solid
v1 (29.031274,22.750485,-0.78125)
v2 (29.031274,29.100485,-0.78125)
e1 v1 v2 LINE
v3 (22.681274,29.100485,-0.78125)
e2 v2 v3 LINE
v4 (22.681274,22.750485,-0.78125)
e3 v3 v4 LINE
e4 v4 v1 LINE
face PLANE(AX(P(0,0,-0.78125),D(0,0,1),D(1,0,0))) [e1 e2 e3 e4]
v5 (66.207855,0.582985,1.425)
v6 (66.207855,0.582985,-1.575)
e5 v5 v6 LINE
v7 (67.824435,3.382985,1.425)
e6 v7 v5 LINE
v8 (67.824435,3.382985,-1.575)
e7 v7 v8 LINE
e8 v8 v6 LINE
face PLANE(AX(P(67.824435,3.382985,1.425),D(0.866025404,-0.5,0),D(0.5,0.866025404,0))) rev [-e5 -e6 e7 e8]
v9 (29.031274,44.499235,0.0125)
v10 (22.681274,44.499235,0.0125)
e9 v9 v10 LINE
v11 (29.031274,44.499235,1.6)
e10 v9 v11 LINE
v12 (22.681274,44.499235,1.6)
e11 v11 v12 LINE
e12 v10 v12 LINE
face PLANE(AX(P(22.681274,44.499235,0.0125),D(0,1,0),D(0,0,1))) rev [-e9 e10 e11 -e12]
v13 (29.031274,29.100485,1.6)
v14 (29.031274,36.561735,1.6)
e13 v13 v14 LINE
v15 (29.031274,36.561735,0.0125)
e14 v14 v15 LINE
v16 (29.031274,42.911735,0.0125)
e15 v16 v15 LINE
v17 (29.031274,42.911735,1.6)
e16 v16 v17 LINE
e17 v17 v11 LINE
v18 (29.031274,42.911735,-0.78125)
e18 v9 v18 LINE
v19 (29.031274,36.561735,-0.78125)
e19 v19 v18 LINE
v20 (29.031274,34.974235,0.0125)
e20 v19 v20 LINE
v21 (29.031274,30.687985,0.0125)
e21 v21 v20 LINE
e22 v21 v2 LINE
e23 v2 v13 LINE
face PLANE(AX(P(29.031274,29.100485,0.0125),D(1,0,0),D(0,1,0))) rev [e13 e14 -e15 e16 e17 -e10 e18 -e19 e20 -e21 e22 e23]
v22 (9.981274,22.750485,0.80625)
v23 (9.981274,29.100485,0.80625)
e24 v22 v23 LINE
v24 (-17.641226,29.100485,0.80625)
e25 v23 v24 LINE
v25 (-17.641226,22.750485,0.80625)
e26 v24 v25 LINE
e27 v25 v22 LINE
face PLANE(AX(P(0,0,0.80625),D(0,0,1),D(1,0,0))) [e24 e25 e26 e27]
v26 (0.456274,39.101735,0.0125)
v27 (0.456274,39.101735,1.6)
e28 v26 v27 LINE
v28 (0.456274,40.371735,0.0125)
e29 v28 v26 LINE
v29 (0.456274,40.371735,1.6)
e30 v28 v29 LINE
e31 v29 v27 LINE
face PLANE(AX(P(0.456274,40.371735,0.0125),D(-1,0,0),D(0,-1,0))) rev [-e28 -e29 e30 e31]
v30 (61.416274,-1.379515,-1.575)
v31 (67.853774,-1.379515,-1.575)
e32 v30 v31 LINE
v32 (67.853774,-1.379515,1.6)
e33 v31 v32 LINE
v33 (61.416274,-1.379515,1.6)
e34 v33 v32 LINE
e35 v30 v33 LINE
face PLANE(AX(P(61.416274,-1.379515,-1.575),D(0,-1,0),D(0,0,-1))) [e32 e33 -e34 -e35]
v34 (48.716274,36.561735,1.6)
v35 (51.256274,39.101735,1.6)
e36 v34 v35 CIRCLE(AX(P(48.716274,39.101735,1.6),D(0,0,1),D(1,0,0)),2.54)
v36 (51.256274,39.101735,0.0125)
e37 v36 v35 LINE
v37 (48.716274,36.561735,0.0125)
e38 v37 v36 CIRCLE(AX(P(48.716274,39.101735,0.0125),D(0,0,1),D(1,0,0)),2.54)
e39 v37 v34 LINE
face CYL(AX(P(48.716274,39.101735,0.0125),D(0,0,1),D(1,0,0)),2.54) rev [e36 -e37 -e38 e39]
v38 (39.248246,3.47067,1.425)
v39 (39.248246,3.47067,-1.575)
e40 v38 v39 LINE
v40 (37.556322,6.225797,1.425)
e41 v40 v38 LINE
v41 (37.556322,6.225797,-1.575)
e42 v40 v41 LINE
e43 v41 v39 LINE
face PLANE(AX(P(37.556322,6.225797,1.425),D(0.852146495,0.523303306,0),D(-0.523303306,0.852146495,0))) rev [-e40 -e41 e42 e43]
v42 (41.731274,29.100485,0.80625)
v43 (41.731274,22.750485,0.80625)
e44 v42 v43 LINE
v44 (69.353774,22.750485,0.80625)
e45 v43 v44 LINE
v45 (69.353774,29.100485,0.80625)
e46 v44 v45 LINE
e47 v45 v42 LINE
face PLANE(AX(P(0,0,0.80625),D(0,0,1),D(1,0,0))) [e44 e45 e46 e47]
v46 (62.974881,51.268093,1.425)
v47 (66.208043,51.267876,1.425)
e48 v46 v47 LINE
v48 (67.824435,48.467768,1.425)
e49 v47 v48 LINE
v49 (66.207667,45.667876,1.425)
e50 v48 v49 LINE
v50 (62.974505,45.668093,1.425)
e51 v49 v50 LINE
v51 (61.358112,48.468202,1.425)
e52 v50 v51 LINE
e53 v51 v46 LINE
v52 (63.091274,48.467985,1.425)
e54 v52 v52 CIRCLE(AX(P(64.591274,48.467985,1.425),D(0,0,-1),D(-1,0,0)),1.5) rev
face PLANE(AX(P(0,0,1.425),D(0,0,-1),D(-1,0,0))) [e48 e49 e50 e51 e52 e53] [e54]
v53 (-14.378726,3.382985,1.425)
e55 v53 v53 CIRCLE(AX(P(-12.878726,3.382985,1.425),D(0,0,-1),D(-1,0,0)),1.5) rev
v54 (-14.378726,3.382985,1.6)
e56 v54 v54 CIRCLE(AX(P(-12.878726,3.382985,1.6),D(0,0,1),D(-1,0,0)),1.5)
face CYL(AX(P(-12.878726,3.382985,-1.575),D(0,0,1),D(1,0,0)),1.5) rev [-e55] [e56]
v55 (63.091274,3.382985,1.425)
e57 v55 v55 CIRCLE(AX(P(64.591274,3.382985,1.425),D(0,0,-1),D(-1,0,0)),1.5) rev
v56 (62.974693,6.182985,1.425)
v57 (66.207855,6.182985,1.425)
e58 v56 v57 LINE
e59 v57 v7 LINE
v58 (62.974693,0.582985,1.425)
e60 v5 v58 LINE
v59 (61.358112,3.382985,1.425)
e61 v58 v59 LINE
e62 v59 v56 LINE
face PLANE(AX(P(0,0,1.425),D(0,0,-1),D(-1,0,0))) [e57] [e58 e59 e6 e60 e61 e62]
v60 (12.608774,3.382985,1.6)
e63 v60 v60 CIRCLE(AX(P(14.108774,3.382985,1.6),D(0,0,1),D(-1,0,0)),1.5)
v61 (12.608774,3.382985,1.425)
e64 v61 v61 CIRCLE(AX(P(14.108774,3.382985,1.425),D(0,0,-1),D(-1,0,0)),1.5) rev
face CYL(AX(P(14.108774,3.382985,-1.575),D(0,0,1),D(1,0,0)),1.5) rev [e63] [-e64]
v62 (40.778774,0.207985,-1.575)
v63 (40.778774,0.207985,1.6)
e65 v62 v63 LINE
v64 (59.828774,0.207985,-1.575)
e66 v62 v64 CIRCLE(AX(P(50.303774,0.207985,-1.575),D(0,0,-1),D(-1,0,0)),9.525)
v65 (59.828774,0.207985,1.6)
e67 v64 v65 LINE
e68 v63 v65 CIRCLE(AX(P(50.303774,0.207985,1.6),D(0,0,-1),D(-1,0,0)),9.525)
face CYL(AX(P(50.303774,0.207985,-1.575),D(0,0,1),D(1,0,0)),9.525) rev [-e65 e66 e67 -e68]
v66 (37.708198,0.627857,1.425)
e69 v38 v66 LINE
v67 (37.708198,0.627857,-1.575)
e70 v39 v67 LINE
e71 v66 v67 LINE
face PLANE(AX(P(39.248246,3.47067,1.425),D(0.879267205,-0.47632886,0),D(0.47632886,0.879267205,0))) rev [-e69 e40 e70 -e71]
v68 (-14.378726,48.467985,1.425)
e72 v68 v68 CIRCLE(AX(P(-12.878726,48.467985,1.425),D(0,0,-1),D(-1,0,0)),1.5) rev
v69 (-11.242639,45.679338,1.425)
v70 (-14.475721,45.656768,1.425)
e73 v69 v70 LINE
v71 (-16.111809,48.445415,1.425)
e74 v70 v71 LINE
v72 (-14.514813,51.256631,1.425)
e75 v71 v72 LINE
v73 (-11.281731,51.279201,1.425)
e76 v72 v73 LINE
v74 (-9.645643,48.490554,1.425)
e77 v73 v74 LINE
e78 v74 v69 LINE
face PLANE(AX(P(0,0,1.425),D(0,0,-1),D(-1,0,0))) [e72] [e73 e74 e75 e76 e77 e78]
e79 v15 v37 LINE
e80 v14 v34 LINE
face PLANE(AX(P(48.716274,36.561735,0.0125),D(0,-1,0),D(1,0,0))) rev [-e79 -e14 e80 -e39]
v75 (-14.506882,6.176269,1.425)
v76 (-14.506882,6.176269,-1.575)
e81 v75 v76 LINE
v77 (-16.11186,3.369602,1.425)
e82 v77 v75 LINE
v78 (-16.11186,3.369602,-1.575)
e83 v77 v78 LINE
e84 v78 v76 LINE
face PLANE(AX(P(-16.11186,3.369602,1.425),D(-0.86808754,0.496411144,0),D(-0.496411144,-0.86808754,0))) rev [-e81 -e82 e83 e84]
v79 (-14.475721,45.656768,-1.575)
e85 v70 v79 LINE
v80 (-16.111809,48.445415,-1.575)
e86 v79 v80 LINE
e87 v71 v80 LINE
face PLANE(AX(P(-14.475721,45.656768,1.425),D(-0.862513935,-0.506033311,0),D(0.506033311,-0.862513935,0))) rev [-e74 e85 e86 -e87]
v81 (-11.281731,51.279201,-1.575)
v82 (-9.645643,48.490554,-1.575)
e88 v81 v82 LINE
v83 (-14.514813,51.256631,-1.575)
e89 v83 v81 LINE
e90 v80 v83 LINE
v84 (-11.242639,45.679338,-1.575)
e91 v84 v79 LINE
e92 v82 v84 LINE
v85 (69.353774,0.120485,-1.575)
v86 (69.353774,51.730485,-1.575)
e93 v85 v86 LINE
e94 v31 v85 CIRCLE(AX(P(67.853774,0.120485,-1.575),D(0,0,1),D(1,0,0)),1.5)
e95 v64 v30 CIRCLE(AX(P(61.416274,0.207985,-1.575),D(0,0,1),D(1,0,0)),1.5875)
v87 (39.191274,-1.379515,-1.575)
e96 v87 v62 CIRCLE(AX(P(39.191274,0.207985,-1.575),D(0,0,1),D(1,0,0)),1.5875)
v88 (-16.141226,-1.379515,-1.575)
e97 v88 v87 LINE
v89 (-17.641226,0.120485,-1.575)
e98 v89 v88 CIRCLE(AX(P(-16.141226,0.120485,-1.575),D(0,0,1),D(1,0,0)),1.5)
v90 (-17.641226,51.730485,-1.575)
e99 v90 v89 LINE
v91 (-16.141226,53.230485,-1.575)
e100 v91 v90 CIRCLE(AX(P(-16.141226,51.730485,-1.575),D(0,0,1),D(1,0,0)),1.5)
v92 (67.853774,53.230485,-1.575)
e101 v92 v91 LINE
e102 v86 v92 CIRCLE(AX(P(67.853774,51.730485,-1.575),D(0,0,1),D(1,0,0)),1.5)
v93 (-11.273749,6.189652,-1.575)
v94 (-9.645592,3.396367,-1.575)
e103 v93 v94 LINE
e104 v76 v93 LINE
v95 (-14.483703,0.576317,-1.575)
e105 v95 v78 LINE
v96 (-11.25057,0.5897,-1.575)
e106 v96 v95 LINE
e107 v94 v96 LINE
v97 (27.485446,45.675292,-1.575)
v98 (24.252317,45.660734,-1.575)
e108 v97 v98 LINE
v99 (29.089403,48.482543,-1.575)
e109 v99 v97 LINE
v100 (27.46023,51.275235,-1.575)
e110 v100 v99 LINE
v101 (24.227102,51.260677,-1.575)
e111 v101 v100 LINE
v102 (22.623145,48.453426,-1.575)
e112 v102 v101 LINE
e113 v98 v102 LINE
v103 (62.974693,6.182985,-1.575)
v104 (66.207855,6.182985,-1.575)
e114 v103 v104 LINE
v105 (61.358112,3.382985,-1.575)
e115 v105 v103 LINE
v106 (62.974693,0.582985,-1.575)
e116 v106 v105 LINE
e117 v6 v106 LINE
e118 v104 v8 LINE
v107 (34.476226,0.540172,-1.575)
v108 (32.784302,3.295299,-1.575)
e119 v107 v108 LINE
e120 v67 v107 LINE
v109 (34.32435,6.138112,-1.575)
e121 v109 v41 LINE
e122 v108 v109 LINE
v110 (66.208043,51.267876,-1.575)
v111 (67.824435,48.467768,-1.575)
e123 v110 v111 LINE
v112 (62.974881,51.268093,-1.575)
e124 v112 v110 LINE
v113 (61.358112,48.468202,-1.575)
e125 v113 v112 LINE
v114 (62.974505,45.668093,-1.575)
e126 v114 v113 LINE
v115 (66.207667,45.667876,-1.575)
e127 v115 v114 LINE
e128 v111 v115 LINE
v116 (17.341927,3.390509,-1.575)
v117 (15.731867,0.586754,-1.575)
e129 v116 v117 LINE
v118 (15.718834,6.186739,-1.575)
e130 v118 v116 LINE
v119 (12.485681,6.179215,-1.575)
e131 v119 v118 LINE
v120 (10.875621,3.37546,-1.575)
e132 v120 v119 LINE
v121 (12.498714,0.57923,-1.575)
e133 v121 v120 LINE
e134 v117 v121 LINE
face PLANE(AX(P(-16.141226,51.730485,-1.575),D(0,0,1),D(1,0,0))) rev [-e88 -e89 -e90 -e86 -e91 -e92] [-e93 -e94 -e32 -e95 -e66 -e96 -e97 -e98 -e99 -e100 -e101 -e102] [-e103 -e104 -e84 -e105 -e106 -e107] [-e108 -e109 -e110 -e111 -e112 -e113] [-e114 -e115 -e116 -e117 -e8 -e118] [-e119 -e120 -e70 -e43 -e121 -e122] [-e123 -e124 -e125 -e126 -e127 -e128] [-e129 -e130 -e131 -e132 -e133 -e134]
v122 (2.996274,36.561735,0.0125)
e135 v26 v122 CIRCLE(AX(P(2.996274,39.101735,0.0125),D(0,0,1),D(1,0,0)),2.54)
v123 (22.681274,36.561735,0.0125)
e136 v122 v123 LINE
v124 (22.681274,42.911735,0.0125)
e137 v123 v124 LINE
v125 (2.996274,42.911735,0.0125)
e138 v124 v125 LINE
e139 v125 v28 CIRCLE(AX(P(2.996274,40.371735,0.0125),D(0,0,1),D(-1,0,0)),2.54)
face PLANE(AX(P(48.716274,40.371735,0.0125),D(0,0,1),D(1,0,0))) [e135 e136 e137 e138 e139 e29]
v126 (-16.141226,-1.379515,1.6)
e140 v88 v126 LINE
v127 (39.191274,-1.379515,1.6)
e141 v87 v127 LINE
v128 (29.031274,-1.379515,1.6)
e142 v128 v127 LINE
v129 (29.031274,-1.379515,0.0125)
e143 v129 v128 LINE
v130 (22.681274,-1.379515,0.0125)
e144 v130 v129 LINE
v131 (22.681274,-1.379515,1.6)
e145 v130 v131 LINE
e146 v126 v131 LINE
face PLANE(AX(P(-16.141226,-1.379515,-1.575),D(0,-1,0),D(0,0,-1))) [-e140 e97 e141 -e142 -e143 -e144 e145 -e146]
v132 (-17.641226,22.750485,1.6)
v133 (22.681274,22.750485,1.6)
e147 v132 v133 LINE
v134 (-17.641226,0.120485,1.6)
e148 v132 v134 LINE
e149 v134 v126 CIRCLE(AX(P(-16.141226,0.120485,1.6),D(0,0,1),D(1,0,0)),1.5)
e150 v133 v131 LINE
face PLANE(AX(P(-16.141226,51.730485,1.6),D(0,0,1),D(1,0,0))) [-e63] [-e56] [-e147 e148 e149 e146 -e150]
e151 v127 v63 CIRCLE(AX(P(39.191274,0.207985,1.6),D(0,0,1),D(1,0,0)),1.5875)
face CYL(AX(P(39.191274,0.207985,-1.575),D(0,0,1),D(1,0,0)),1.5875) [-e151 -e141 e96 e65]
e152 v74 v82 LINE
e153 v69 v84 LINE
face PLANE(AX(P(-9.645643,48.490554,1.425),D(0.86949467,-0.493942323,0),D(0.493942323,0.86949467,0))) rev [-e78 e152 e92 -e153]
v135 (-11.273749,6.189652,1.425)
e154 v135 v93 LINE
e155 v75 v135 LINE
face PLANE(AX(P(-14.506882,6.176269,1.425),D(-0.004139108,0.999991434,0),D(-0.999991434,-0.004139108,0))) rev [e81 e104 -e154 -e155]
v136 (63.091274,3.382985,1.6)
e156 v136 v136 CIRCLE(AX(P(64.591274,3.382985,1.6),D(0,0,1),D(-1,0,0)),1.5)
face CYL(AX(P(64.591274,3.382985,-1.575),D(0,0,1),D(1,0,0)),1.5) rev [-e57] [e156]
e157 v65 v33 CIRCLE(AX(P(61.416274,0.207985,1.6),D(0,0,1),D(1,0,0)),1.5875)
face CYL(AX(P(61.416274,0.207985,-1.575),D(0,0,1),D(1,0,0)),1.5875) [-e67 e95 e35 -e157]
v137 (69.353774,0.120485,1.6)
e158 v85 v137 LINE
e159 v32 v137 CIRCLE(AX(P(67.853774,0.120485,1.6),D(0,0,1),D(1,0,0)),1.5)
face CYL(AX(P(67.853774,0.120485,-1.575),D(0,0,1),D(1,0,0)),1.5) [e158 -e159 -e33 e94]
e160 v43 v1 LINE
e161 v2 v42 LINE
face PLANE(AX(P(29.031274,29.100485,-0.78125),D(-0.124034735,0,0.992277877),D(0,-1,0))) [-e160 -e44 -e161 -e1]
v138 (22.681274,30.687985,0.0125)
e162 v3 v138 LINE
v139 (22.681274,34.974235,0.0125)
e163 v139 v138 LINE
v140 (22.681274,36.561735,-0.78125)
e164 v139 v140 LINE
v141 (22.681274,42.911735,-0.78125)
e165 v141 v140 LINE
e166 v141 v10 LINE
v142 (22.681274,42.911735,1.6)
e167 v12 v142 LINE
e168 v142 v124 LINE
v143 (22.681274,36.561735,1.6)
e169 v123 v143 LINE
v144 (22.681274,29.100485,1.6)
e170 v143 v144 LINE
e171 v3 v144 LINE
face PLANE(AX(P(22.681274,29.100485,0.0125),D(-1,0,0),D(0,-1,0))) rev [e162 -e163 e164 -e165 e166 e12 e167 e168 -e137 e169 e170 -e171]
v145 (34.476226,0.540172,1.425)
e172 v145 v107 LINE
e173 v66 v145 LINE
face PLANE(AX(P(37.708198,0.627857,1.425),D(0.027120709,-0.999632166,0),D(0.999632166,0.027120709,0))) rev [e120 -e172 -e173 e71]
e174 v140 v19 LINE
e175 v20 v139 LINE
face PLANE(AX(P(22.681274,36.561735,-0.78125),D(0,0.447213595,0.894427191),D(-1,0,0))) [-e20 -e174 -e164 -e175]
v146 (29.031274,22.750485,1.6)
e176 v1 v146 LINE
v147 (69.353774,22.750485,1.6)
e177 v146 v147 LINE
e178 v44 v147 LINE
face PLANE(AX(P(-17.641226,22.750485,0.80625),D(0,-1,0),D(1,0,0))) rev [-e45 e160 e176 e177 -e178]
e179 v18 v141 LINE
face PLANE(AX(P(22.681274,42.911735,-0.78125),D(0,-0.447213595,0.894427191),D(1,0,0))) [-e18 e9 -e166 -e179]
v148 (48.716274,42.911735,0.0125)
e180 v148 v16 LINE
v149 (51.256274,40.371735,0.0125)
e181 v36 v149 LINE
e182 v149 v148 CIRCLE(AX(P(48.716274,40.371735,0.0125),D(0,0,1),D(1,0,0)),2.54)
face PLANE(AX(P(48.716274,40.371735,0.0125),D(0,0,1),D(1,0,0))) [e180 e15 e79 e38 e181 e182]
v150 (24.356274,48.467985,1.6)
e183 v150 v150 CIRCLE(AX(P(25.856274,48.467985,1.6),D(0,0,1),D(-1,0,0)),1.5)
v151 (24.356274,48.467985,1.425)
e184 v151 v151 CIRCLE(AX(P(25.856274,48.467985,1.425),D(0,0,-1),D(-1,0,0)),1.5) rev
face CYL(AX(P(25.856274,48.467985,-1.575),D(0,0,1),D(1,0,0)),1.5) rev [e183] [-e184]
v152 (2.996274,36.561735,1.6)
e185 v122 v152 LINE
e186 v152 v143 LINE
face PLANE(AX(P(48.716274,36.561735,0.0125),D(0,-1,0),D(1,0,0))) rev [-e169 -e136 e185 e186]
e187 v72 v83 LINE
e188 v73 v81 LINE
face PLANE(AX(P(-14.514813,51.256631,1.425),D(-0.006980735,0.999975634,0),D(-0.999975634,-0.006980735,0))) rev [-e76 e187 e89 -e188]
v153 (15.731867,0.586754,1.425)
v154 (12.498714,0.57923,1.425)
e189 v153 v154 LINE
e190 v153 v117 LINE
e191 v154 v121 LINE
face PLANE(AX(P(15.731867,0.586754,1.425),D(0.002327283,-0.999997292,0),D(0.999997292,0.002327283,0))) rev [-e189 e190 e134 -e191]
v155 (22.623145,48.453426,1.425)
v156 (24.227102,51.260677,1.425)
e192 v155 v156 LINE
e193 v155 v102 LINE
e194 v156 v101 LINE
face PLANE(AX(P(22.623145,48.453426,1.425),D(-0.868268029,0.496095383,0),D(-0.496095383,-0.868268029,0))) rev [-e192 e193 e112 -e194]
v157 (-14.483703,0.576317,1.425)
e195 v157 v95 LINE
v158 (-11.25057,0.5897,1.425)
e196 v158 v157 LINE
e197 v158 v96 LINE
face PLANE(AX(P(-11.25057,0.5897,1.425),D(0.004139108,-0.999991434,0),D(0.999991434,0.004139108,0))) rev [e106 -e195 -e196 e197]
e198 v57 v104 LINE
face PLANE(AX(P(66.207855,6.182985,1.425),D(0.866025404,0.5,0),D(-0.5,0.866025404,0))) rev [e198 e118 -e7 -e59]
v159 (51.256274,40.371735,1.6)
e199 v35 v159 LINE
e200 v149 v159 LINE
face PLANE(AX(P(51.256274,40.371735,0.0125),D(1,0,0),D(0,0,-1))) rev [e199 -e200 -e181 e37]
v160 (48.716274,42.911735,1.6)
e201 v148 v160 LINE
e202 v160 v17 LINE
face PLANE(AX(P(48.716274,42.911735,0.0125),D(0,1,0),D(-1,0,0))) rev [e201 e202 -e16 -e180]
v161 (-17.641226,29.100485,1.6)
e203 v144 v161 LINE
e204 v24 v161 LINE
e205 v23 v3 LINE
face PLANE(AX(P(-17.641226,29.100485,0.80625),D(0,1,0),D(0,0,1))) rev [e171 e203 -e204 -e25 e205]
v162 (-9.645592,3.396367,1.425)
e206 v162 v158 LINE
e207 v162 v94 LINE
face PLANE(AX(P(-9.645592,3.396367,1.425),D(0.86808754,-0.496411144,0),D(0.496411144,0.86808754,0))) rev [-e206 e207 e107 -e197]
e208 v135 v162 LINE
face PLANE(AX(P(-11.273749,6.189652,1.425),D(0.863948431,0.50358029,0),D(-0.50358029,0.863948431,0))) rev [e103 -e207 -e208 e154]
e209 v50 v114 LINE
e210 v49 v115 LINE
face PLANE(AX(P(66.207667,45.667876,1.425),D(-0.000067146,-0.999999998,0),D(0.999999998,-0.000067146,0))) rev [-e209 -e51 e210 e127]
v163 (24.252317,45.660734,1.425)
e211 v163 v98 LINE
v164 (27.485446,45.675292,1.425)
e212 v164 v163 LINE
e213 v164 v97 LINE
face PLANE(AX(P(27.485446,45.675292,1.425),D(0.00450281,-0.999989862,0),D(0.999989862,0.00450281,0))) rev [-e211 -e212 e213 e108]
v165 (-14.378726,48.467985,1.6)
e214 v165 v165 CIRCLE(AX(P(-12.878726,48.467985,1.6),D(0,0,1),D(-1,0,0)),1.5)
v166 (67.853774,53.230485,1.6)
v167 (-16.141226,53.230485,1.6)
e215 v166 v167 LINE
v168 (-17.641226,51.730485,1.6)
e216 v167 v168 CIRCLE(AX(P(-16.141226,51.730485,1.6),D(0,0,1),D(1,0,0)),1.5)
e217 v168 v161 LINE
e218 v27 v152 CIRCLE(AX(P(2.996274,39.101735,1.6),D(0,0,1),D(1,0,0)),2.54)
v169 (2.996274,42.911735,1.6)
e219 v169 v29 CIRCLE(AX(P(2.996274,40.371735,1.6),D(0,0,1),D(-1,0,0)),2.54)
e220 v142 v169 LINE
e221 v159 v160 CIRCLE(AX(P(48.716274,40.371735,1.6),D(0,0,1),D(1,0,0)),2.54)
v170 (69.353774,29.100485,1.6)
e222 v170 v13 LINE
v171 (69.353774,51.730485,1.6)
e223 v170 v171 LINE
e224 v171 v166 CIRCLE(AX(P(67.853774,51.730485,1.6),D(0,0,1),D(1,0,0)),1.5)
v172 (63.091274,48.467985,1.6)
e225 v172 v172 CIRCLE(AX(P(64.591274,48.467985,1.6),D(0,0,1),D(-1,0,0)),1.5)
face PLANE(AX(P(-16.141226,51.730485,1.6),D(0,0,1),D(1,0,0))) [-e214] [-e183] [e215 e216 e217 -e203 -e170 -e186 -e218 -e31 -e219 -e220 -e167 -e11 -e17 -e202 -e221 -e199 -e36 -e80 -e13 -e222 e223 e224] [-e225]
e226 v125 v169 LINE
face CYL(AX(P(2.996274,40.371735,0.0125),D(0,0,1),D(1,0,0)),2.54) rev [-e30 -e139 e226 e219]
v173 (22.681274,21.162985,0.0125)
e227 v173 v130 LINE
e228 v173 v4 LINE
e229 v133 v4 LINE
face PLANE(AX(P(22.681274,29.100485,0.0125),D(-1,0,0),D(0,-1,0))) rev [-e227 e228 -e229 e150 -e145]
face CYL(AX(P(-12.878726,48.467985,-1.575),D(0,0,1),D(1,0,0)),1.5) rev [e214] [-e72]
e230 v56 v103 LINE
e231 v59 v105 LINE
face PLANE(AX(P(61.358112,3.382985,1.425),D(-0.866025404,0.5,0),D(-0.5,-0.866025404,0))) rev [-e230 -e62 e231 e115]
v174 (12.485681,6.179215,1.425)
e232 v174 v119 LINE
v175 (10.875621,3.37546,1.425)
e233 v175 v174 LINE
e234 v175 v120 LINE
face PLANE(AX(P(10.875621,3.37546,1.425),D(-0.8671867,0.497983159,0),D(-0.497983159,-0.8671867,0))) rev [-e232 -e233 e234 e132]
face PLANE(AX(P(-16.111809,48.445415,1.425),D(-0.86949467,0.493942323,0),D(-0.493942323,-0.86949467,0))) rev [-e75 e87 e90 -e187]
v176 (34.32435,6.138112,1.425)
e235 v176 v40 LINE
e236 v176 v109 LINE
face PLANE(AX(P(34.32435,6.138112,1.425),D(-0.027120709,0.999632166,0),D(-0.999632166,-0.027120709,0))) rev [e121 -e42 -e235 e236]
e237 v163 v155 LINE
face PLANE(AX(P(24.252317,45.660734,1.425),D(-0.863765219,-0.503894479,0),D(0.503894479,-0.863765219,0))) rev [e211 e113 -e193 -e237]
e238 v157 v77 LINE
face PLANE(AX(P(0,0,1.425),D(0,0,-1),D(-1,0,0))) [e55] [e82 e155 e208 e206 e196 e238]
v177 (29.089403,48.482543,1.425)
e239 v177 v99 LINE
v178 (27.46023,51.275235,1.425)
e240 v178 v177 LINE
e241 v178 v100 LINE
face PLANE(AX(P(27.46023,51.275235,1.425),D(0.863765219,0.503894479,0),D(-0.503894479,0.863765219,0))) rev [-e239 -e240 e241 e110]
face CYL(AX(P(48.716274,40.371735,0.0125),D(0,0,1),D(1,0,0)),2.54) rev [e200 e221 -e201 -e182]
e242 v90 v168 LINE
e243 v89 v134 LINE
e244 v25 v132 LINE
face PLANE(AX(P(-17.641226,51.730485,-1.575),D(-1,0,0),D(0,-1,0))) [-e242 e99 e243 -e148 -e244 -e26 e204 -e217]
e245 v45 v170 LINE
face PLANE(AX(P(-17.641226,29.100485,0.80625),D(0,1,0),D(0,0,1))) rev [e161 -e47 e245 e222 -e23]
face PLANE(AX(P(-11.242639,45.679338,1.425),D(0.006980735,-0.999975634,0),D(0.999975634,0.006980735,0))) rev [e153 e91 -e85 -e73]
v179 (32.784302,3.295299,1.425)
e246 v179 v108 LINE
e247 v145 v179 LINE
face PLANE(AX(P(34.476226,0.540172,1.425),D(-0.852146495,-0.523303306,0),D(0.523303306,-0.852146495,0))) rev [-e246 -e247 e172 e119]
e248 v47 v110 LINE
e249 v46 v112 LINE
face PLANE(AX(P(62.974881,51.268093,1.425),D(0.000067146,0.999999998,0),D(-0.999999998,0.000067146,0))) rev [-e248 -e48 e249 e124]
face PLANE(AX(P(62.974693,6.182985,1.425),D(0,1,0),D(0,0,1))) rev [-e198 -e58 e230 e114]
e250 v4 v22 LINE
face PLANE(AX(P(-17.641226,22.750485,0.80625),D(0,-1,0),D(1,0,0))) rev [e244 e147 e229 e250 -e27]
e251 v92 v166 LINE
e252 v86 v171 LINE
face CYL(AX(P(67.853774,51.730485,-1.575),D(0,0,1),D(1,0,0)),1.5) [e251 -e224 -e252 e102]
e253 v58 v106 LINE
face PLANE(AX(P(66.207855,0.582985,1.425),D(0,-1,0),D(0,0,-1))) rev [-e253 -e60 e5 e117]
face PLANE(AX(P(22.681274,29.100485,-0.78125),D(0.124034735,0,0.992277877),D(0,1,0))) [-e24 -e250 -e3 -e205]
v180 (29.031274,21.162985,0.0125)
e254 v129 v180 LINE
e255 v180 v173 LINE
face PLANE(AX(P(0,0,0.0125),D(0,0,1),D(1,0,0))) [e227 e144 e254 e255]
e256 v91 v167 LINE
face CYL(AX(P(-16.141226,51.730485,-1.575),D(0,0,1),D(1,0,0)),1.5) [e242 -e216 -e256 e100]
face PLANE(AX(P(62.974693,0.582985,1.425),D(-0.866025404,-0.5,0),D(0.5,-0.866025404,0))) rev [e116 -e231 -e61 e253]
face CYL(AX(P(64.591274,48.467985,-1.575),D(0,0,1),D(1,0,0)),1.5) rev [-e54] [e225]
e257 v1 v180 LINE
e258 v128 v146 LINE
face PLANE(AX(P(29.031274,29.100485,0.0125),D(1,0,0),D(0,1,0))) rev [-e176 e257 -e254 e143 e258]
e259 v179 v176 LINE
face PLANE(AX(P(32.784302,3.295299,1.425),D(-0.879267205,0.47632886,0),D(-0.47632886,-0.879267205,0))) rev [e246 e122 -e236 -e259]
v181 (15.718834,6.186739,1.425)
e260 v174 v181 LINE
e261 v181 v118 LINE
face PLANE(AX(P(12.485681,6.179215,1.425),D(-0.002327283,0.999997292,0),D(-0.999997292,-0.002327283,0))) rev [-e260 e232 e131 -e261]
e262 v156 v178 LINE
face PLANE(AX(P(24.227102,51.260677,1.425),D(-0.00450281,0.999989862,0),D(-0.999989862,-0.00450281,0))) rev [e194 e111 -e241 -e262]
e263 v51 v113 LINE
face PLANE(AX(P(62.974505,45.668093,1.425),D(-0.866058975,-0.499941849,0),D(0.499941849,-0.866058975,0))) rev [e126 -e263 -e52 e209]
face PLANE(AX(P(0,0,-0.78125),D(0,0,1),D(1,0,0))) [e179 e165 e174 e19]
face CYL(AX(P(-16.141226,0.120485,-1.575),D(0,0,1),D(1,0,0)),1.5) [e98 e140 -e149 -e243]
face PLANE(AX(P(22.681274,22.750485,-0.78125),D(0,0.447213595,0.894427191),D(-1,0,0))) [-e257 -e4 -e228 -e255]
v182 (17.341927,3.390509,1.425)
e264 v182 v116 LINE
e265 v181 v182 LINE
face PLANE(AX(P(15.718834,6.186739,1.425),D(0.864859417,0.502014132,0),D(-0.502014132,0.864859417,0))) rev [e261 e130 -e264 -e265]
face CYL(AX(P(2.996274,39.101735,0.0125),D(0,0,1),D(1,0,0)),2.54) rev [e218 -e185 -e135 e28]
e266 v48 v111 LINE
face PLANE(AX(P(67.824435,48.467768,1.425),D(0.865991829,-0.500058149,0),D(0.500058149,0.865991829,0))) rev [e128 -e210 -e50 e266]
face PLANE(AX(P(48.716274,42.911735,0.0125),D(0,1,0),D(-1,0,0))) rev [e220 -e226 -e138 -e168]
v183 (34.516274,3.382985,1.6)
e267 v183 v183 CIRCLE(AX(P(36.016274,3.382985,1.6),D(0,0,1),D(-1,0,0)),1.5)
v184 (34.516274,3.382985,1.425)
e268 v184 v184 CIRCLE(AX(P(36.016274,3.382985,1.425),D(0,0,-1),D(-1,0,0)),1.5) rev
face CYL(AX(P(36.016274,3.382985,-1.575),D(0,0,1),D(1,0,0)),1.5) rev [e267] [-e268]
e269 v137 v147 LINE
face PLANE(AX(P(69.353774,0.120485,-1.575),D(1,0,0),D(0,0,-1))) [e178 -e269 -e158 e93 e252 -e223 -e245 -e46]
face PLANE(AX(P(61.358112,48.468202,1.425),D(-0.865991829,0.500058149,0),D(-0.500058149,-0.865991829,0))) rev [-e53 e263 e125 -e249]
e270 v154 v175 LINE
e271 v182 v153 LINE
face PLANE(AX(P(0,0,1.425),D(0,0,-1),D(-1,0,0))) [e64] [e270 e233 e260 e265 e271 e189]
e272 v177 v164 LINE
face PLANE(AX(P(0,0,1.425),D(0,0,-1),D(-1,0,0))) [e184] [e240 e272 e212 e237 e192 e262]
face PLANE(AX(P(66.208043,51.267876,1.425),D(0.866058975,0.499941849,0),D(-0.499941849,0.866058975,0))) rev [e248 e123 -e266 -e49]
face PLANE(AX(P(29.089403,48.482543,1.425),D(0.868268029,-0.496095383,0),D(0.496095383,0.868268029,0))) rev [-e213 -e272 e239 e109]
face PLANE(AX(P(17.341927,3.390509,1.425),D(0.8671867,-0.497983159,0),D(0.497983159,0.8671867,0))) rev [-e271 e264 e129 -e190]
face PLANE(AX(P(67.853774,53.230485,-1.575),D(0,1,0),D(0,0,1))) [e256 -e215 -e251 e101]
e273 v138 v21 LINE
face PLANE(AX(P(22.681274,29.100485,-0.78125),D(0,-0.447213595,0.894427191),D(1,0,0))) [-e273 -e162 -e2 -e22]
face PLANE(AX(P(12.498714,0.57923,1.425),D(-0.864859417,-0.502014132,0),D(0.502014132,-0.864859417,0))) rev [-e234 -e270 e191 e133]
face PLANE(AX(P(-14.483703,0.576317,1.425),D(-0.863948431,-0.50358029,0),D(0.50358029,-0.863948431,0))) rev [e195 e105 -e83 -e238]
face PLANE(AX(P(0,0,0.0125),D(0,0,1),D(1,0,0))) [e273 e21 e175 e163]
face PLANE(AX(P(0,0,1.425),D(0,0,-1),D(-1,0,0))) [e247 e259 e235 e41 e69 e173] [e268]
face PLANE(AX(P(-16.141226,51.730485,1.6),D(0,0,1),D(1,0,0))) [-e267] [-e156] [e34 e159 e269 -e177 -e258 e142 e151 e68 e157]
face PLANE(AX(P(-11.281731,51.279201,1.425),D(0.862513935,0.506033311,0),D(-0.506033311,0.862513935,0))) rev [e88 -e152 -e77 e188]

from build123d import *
from OCP.BRepFilletAPI import BRepFilletAPI_MakeChamfer

# Parameters (mm, degrees)
SKETCH1_R           = 1.5
BOSS_EXTRUDE1_DEPTH = 3.175
SKETCH2_W           = 86.995
SKETCH2_H           = 6.35
CUT_EXTRUDE1_DEPTH  = 0.79375
SKETCH3_W           = 6.35
SKETCH3_H           = 30.48
CUT_EXTRUDE2_DEPTH  = 1.5875
SKETCH4_W           = 6.35
SKETCH4_H           = 15.39875
CUT_EXTRUDE3_DEPTH  = 1.5875
SKETCH6_W           = 6.35
SKETCH6_H           = 6.35
CUT_EXTRUDE4_DEPTH  = 0.79375
CHAMFER2_SIZE       = 1.5875
CHAMFER2_SIZE_2     = 0.79375
CUT_EXTRUDE5_DEPTH  = 1.5875
CUT_EXTRUDE6_DEPTH  = 3
SKETCH11_W          = 6.35
SKETCH11_H          = 6.35
CUT_EXTRUDE8_DEPTH  = 0.79375
CHAMFER3_START      = 22.750484618
CHAMFER3_DEPTH      = 6.35
CHAMFER4_SIZE       = 0.79375
CHAMFER4_SIZE_2     = 1.5875


with BuildPart() as part:
    # Sketch1 → Boss-Extrude1 (new body)
    with BuildSketch(Plane.XY.offset(1.6)):
        with BuildLine():
            Line((-17.641226071, 51.730484618), (-17.641226071, 0.120484618))
            ThreePointArc((-17.641226071, 0.120484618), (-17.201886242, -0.940175553), (-16.141226071, -1.379515382))
            Line((-16.141226071, -1.379515382), (39.191273929, -1.379515382))
            ThreePointArc((39.191273929, -1.379515382), (40.313805944, -0.914547397), (40.778773929, 0.207984618))
            ThreePointArc((40.778773929, 0.207984618), (50.303773929, 9.732984618), (59.828773929, 0.207984618))
            ThreePointArc((59.828773929, 0.207984618), (60.293741914, -0.914547397), (61.416273929, -1.379515382))
            Line((61.416273929, -1.379515382), (67.853773929, -1.379515382))
            ThreePointArc((67.853773929, -1.379515382), (68.914434101, -0.940175553), (69.353773929, 0.120484618))
            Line((69.353773929, 0.120484618), (69.353773929, 51.730484618))
            ThreePointArc((69.353773929, 51.730484618), (68.914434101, 52.79114479), (67.853773929, 53.230484618))
            Line((67.853773929, 53.230484618), (-16.141226071, 53.230484618))
            ThreePointArc((-16.141226071, 53.230484618), (-17.201886242, 52.79114479), (-17.641226071, 51.730484618))
        make_face()
        with Locations(Location((-12.878726071, 48.467984618, 0), (0, 0, 180))):
            Circle(SKETCH1_R, mode=Mode.SUBTRACT)
        with Locations(Location((-12.878726071, 3.382984618, 0), (0, 0, 180))):
            Circle(SKETCH1_R, mode=Mode.SUBTRACT)
        with Locations(Location((64.591273929, 3.382984618, 0), (0, 0, 180))):
            Circle(SKETCH1_R, mode=Mode.SUBTRACT)
        with Locations(Location((64.591273929, 48.467984618, 0), (0, 0, 180))):
            Circle(SKETCH1_R, mode=Mode.SUBTRACT)
        with Locations(Location((14.108773929, 3.382984618, 0), (0, 0, 180))):
            Circle(SKETCH1_R, mode=Mode.SUBTRACT)
        with Locations(Location((36.016273929, 3.382984618, 0), (0, 0, 180))):
            Circle(SKETCH1_R, mode=Mode.SUBTRACT)
        with Locations(Location((25.856273929, 48.467984618, 0), (0, 0, 180))):
            Circle(SKETCH1_R, mode=Mode.SUBTRACT)
    extrude(amount=-BOSS_EXTRUDE1_DEPTH)

    # Sketch2 → Cut-Extrude1 (cut)
    with BuildSketch(Plane.XY.offset(1.6)):
        with Locations((25.856273929, 25.925484618)):
            Rectangle(SKETCH2_W, SKETCH2_H)
    extrude(amount=-CUT_EXTRUDE1_DEPTH, mode=Mode.SUBTRACT)

    # Sketch3 → Cut-Extrude2 (cut)
    with BuildSketch(Plane.XY.offset(1.6)):
        with Locations((25.856273929, 13.860484618)):
            Rectangle(SKETCH3_W, SKETCH3_H)
    extrude(amount=-CUT_EXTRUDE2_DEPTH, mode=Mode.SUBTRACT)

    # Sketch4 → Cut-Extrude3 (cut)
    with BuildSketch(Plane.XY.offset(1.6)):
        with Locations((25.856273929, 36.799859618)):
            Rectangle(SKETCH4_W, SKETCH4_H)
    extrude(amount=-CUT_EXTRUDE3_DEPTH, mode=Mode.SUBTRACT)

    # Sketch6 → Cut-Extrude4 (cut)
    with BuildSketch(Plane.XY.offset(0.0125)):
        with Locations((25.856273929, 39.736734618)):
            Rectangle(SKETCH6_W, SKETCH6_H)
    extrude(amount=-CUT_EXTRUDE4_DEPTH, mode=Mode.SUBTRACT)

    # Chamfer2
    chamfer2_edges_1 = [part.edges().sort_by_distance(p)[0] for p in [
        (25.856273929, 36.561734618, 0.0125),
    ]]
    chamfer2_side_1 = [part.faces().sort_by_distance(p)[0] for p in [
        (25.856273929, 36.545859618, 0.0125),
    ]]
    chamfer2_edges_2 = [part.edges().sort_by_distance(p)[0] for p in [
        (25.856273929, 42.911734618, 0.0125),
    ]]
    chamfer2_side_2 = [part.faces().sort_by_distance(p)[0] for p in [
        (25.856273929, 42.927609618, 0.0125),
    ]]
    chamfer2 = BRepFilletAPI_MakeChamfer(part.part.solid().wrapped)
    for e in chamfer2_edges_1:
        chamfer2.Add(CHAMFER2_SIZE - 0.0001, CHAMFER2_SIZE_2 - 0.0001, e.wrapped, chamfer2_side_1[0].wrapped)
    for e in chamfer2_edges_2:
        chamfer2.Add(CHAMFER2_SIZE - 0.0001, CHAMFER2_SIZE_2 - 0.0001, e.wrapped, chamfer2_side_2[0].wrapped)
    add(Compound.cast(chamfer2.Shape()), mode=Mode.REPLACE)  # a hair under: the kernel refuses the full size

    # Sketch7 → Cut-Extrude5 (cut)
    with BuildSketch(Plane.XY.offset(1.6)):
        with BuildLine():
            Line((48.716273929, 42.911734618), (2.996273929, 42.911734618))
            ThreePointArc((2.996273929, 42.911734618), (1.200222705, 42.167785843), (0.456273929, 40.371734618))
            Line((0.456273929, 40.371734618), (0.456273929, 39.101734618))
            ThreePointArc((0.456273929, 39.101734618), (1.200222705, 37.305683394), (2.996273929, 36.561734618))
            Line((2.996273929, 36.561734618), (48.716273929, 36.561734618))
            ThreePointArc((48.716273929, 36.561734618), (50.512325153, 37.305683394), (51.256273929, 39.101734618))
            Line((51.256273929, 39.101734618), (51.256273929, 40.371734618))
            ThreePointArc((51.256273929, 40.371734618), (50.512325153, 42.167785843), (48.716273929, 42.911734618))
        make_face()
    extrude(amount=-CUT_EXTRUDE5_DEPTH, mode=Mode.SUBTRACT)

    # Sketch9 → Cut-Extrude6 (cut)
    with BuildSketch(Plane(origin=(0, 0, -1.575), x_dir=(-1, 0, 0), z_dir=(0, 0, -1))):
        Polygon((-22.623145199, 48.453426307), (-24.227101696, 51.260677077), (-27.460230427, 51.275235389), (-29.08940266, 48.48254293), (-27.485446162, 45.67529216), (-24.252317432, 45.660733848), align=None)
        Polygon((-10.875621178, 3.375460135), (-12.48568116, 6.179214794), (-15.718833912, 6.186739277), (-17.341926681, 3.390509102), (-15.731866699, 0.586754443), (-12.498713947, 0.57922996), align=None)
        Polygon((16.111859882, 3.369602212), (14.50688248, 6.17626943), (11.273748669, 6.189651836), (9.645592259, 3.396367025), (11.250569661, 0.589699807), (14.483703473, 0.576317401), align=None)
        Polygon((16.1118088, 48.445414775), (14.514813493, 51.256631473), (11.281730764, 51.279201317), (9.645643341, 48.490554462), (11.242638648, 45.679337764), (14.475721377, 45.65676792), align=None)
        Polygon((-61.358112429, 48.468201712), (-62.974881187, 51.268093159), (-66.208042688, 51.267876066), (-67.824435429, 48.467767525), (-66.207666671, 45.667876078), (-62.974505171, 45.668093171), align=None)
        Polygon((-61.358112422, 3.382984618), (-62.974693176, 6.182984618), (-66.207854683, 6.182984618), (-67.824435437, 3.382984618), (-66.207854683, 0.582984618), (-62.974693176, 0.582984618), align=None)
        Polygon((-32.784301689, 3.295298985), (-34.324349823, 6.138111866), (-37.556322063, 6.2257975), (-39.24824617, 3.470670252), (-37.708198036, 0.627857371), (-34.476225796, 0.540171737), align=None)
    extrude(amount=-CUT_EXTRUDE6_DEPTH, mode=Mode.SUBTRACT)

    # Sketch11 → Cut-Extrude8 (cut)
    with BuildSketch(Plane.XY.offset(0.0125)):
        with Locations((25.856273929, 25.925484618)):
            Rectangle(SKETCH11_W, SKETCH11_H)
    extrude(amount=-CUT_EXTRUDE8_DEPTH, mode=Mode.SUBTRACT)

    # Chamfer3: read off the stored shape, not the designer's step
    # Chamfer3 outline → Chamfer3 (cut)
    with BuildSketch(Plane(origin=(0, 0, 0), x_dir=(1, 0, 0), z_dir=(0, 1, 0)).offset(CHAMFER3_START)):
        Polygon((22.681273929, 0.78125), (9.981273929, -0.80625), (22.681273929, -0.80625), align=None)
        Polygon((41.731273929, -0.80625), (29.031273929, 0.78125), (29.031273929, -0.80625), align=None)
    extrude(amount=CHAMFER3_DEPTH, mode=Mode.SUBTRACT)

    # Chamfer4
    chamfer4_edges_1 = [part.edges().sort_by_distance(p)[0] for p in [
        (25.856273929, 22.750484618, 0.0125),
    ]]
    chamfer4_side_1 = [part.faces().sort_by_distance(p)[0] for p in [
        (25.856273929, 22.750484618, -0.003375),
    ]]
    chamfer4_edges_2 = [part.edges().sort_by_distance(p)[0] for p in [
        (25.856273929, 29.100484618, 0.0125),
    ]]
    chamfer4_side_2 = [part.faces().sort_by_distance(p)[0] for p in [
        (25.856273929, 29.100484618, -0.003375),
    ]]
    chamfer4 = BRepFilletAPI_MakeChamfer(part.part.solid().wrapped)
    for e in chamfer4_edges_1:
        chamfer4.Add(CHAMFER4_SIZE - 0.0001, CHAMFER4_SIZE_2 - 0.0001, e.wrapped, chamfer4_side_1[0].wrapped)
    for e in chamfer4_edges_2:
        chamfer4.Add(CHAMFER4_SIZE - 0.0001, CHAMFER4_SIZE_2 - 0.0001, e.wrapped, chamfer4_side_2[0].wrapped)
    add(Compound.cast(chamfer4.Shape()), mode=Mode.REPLACE)  # a hair under: the kernel refuses the full size


solid = part.part
